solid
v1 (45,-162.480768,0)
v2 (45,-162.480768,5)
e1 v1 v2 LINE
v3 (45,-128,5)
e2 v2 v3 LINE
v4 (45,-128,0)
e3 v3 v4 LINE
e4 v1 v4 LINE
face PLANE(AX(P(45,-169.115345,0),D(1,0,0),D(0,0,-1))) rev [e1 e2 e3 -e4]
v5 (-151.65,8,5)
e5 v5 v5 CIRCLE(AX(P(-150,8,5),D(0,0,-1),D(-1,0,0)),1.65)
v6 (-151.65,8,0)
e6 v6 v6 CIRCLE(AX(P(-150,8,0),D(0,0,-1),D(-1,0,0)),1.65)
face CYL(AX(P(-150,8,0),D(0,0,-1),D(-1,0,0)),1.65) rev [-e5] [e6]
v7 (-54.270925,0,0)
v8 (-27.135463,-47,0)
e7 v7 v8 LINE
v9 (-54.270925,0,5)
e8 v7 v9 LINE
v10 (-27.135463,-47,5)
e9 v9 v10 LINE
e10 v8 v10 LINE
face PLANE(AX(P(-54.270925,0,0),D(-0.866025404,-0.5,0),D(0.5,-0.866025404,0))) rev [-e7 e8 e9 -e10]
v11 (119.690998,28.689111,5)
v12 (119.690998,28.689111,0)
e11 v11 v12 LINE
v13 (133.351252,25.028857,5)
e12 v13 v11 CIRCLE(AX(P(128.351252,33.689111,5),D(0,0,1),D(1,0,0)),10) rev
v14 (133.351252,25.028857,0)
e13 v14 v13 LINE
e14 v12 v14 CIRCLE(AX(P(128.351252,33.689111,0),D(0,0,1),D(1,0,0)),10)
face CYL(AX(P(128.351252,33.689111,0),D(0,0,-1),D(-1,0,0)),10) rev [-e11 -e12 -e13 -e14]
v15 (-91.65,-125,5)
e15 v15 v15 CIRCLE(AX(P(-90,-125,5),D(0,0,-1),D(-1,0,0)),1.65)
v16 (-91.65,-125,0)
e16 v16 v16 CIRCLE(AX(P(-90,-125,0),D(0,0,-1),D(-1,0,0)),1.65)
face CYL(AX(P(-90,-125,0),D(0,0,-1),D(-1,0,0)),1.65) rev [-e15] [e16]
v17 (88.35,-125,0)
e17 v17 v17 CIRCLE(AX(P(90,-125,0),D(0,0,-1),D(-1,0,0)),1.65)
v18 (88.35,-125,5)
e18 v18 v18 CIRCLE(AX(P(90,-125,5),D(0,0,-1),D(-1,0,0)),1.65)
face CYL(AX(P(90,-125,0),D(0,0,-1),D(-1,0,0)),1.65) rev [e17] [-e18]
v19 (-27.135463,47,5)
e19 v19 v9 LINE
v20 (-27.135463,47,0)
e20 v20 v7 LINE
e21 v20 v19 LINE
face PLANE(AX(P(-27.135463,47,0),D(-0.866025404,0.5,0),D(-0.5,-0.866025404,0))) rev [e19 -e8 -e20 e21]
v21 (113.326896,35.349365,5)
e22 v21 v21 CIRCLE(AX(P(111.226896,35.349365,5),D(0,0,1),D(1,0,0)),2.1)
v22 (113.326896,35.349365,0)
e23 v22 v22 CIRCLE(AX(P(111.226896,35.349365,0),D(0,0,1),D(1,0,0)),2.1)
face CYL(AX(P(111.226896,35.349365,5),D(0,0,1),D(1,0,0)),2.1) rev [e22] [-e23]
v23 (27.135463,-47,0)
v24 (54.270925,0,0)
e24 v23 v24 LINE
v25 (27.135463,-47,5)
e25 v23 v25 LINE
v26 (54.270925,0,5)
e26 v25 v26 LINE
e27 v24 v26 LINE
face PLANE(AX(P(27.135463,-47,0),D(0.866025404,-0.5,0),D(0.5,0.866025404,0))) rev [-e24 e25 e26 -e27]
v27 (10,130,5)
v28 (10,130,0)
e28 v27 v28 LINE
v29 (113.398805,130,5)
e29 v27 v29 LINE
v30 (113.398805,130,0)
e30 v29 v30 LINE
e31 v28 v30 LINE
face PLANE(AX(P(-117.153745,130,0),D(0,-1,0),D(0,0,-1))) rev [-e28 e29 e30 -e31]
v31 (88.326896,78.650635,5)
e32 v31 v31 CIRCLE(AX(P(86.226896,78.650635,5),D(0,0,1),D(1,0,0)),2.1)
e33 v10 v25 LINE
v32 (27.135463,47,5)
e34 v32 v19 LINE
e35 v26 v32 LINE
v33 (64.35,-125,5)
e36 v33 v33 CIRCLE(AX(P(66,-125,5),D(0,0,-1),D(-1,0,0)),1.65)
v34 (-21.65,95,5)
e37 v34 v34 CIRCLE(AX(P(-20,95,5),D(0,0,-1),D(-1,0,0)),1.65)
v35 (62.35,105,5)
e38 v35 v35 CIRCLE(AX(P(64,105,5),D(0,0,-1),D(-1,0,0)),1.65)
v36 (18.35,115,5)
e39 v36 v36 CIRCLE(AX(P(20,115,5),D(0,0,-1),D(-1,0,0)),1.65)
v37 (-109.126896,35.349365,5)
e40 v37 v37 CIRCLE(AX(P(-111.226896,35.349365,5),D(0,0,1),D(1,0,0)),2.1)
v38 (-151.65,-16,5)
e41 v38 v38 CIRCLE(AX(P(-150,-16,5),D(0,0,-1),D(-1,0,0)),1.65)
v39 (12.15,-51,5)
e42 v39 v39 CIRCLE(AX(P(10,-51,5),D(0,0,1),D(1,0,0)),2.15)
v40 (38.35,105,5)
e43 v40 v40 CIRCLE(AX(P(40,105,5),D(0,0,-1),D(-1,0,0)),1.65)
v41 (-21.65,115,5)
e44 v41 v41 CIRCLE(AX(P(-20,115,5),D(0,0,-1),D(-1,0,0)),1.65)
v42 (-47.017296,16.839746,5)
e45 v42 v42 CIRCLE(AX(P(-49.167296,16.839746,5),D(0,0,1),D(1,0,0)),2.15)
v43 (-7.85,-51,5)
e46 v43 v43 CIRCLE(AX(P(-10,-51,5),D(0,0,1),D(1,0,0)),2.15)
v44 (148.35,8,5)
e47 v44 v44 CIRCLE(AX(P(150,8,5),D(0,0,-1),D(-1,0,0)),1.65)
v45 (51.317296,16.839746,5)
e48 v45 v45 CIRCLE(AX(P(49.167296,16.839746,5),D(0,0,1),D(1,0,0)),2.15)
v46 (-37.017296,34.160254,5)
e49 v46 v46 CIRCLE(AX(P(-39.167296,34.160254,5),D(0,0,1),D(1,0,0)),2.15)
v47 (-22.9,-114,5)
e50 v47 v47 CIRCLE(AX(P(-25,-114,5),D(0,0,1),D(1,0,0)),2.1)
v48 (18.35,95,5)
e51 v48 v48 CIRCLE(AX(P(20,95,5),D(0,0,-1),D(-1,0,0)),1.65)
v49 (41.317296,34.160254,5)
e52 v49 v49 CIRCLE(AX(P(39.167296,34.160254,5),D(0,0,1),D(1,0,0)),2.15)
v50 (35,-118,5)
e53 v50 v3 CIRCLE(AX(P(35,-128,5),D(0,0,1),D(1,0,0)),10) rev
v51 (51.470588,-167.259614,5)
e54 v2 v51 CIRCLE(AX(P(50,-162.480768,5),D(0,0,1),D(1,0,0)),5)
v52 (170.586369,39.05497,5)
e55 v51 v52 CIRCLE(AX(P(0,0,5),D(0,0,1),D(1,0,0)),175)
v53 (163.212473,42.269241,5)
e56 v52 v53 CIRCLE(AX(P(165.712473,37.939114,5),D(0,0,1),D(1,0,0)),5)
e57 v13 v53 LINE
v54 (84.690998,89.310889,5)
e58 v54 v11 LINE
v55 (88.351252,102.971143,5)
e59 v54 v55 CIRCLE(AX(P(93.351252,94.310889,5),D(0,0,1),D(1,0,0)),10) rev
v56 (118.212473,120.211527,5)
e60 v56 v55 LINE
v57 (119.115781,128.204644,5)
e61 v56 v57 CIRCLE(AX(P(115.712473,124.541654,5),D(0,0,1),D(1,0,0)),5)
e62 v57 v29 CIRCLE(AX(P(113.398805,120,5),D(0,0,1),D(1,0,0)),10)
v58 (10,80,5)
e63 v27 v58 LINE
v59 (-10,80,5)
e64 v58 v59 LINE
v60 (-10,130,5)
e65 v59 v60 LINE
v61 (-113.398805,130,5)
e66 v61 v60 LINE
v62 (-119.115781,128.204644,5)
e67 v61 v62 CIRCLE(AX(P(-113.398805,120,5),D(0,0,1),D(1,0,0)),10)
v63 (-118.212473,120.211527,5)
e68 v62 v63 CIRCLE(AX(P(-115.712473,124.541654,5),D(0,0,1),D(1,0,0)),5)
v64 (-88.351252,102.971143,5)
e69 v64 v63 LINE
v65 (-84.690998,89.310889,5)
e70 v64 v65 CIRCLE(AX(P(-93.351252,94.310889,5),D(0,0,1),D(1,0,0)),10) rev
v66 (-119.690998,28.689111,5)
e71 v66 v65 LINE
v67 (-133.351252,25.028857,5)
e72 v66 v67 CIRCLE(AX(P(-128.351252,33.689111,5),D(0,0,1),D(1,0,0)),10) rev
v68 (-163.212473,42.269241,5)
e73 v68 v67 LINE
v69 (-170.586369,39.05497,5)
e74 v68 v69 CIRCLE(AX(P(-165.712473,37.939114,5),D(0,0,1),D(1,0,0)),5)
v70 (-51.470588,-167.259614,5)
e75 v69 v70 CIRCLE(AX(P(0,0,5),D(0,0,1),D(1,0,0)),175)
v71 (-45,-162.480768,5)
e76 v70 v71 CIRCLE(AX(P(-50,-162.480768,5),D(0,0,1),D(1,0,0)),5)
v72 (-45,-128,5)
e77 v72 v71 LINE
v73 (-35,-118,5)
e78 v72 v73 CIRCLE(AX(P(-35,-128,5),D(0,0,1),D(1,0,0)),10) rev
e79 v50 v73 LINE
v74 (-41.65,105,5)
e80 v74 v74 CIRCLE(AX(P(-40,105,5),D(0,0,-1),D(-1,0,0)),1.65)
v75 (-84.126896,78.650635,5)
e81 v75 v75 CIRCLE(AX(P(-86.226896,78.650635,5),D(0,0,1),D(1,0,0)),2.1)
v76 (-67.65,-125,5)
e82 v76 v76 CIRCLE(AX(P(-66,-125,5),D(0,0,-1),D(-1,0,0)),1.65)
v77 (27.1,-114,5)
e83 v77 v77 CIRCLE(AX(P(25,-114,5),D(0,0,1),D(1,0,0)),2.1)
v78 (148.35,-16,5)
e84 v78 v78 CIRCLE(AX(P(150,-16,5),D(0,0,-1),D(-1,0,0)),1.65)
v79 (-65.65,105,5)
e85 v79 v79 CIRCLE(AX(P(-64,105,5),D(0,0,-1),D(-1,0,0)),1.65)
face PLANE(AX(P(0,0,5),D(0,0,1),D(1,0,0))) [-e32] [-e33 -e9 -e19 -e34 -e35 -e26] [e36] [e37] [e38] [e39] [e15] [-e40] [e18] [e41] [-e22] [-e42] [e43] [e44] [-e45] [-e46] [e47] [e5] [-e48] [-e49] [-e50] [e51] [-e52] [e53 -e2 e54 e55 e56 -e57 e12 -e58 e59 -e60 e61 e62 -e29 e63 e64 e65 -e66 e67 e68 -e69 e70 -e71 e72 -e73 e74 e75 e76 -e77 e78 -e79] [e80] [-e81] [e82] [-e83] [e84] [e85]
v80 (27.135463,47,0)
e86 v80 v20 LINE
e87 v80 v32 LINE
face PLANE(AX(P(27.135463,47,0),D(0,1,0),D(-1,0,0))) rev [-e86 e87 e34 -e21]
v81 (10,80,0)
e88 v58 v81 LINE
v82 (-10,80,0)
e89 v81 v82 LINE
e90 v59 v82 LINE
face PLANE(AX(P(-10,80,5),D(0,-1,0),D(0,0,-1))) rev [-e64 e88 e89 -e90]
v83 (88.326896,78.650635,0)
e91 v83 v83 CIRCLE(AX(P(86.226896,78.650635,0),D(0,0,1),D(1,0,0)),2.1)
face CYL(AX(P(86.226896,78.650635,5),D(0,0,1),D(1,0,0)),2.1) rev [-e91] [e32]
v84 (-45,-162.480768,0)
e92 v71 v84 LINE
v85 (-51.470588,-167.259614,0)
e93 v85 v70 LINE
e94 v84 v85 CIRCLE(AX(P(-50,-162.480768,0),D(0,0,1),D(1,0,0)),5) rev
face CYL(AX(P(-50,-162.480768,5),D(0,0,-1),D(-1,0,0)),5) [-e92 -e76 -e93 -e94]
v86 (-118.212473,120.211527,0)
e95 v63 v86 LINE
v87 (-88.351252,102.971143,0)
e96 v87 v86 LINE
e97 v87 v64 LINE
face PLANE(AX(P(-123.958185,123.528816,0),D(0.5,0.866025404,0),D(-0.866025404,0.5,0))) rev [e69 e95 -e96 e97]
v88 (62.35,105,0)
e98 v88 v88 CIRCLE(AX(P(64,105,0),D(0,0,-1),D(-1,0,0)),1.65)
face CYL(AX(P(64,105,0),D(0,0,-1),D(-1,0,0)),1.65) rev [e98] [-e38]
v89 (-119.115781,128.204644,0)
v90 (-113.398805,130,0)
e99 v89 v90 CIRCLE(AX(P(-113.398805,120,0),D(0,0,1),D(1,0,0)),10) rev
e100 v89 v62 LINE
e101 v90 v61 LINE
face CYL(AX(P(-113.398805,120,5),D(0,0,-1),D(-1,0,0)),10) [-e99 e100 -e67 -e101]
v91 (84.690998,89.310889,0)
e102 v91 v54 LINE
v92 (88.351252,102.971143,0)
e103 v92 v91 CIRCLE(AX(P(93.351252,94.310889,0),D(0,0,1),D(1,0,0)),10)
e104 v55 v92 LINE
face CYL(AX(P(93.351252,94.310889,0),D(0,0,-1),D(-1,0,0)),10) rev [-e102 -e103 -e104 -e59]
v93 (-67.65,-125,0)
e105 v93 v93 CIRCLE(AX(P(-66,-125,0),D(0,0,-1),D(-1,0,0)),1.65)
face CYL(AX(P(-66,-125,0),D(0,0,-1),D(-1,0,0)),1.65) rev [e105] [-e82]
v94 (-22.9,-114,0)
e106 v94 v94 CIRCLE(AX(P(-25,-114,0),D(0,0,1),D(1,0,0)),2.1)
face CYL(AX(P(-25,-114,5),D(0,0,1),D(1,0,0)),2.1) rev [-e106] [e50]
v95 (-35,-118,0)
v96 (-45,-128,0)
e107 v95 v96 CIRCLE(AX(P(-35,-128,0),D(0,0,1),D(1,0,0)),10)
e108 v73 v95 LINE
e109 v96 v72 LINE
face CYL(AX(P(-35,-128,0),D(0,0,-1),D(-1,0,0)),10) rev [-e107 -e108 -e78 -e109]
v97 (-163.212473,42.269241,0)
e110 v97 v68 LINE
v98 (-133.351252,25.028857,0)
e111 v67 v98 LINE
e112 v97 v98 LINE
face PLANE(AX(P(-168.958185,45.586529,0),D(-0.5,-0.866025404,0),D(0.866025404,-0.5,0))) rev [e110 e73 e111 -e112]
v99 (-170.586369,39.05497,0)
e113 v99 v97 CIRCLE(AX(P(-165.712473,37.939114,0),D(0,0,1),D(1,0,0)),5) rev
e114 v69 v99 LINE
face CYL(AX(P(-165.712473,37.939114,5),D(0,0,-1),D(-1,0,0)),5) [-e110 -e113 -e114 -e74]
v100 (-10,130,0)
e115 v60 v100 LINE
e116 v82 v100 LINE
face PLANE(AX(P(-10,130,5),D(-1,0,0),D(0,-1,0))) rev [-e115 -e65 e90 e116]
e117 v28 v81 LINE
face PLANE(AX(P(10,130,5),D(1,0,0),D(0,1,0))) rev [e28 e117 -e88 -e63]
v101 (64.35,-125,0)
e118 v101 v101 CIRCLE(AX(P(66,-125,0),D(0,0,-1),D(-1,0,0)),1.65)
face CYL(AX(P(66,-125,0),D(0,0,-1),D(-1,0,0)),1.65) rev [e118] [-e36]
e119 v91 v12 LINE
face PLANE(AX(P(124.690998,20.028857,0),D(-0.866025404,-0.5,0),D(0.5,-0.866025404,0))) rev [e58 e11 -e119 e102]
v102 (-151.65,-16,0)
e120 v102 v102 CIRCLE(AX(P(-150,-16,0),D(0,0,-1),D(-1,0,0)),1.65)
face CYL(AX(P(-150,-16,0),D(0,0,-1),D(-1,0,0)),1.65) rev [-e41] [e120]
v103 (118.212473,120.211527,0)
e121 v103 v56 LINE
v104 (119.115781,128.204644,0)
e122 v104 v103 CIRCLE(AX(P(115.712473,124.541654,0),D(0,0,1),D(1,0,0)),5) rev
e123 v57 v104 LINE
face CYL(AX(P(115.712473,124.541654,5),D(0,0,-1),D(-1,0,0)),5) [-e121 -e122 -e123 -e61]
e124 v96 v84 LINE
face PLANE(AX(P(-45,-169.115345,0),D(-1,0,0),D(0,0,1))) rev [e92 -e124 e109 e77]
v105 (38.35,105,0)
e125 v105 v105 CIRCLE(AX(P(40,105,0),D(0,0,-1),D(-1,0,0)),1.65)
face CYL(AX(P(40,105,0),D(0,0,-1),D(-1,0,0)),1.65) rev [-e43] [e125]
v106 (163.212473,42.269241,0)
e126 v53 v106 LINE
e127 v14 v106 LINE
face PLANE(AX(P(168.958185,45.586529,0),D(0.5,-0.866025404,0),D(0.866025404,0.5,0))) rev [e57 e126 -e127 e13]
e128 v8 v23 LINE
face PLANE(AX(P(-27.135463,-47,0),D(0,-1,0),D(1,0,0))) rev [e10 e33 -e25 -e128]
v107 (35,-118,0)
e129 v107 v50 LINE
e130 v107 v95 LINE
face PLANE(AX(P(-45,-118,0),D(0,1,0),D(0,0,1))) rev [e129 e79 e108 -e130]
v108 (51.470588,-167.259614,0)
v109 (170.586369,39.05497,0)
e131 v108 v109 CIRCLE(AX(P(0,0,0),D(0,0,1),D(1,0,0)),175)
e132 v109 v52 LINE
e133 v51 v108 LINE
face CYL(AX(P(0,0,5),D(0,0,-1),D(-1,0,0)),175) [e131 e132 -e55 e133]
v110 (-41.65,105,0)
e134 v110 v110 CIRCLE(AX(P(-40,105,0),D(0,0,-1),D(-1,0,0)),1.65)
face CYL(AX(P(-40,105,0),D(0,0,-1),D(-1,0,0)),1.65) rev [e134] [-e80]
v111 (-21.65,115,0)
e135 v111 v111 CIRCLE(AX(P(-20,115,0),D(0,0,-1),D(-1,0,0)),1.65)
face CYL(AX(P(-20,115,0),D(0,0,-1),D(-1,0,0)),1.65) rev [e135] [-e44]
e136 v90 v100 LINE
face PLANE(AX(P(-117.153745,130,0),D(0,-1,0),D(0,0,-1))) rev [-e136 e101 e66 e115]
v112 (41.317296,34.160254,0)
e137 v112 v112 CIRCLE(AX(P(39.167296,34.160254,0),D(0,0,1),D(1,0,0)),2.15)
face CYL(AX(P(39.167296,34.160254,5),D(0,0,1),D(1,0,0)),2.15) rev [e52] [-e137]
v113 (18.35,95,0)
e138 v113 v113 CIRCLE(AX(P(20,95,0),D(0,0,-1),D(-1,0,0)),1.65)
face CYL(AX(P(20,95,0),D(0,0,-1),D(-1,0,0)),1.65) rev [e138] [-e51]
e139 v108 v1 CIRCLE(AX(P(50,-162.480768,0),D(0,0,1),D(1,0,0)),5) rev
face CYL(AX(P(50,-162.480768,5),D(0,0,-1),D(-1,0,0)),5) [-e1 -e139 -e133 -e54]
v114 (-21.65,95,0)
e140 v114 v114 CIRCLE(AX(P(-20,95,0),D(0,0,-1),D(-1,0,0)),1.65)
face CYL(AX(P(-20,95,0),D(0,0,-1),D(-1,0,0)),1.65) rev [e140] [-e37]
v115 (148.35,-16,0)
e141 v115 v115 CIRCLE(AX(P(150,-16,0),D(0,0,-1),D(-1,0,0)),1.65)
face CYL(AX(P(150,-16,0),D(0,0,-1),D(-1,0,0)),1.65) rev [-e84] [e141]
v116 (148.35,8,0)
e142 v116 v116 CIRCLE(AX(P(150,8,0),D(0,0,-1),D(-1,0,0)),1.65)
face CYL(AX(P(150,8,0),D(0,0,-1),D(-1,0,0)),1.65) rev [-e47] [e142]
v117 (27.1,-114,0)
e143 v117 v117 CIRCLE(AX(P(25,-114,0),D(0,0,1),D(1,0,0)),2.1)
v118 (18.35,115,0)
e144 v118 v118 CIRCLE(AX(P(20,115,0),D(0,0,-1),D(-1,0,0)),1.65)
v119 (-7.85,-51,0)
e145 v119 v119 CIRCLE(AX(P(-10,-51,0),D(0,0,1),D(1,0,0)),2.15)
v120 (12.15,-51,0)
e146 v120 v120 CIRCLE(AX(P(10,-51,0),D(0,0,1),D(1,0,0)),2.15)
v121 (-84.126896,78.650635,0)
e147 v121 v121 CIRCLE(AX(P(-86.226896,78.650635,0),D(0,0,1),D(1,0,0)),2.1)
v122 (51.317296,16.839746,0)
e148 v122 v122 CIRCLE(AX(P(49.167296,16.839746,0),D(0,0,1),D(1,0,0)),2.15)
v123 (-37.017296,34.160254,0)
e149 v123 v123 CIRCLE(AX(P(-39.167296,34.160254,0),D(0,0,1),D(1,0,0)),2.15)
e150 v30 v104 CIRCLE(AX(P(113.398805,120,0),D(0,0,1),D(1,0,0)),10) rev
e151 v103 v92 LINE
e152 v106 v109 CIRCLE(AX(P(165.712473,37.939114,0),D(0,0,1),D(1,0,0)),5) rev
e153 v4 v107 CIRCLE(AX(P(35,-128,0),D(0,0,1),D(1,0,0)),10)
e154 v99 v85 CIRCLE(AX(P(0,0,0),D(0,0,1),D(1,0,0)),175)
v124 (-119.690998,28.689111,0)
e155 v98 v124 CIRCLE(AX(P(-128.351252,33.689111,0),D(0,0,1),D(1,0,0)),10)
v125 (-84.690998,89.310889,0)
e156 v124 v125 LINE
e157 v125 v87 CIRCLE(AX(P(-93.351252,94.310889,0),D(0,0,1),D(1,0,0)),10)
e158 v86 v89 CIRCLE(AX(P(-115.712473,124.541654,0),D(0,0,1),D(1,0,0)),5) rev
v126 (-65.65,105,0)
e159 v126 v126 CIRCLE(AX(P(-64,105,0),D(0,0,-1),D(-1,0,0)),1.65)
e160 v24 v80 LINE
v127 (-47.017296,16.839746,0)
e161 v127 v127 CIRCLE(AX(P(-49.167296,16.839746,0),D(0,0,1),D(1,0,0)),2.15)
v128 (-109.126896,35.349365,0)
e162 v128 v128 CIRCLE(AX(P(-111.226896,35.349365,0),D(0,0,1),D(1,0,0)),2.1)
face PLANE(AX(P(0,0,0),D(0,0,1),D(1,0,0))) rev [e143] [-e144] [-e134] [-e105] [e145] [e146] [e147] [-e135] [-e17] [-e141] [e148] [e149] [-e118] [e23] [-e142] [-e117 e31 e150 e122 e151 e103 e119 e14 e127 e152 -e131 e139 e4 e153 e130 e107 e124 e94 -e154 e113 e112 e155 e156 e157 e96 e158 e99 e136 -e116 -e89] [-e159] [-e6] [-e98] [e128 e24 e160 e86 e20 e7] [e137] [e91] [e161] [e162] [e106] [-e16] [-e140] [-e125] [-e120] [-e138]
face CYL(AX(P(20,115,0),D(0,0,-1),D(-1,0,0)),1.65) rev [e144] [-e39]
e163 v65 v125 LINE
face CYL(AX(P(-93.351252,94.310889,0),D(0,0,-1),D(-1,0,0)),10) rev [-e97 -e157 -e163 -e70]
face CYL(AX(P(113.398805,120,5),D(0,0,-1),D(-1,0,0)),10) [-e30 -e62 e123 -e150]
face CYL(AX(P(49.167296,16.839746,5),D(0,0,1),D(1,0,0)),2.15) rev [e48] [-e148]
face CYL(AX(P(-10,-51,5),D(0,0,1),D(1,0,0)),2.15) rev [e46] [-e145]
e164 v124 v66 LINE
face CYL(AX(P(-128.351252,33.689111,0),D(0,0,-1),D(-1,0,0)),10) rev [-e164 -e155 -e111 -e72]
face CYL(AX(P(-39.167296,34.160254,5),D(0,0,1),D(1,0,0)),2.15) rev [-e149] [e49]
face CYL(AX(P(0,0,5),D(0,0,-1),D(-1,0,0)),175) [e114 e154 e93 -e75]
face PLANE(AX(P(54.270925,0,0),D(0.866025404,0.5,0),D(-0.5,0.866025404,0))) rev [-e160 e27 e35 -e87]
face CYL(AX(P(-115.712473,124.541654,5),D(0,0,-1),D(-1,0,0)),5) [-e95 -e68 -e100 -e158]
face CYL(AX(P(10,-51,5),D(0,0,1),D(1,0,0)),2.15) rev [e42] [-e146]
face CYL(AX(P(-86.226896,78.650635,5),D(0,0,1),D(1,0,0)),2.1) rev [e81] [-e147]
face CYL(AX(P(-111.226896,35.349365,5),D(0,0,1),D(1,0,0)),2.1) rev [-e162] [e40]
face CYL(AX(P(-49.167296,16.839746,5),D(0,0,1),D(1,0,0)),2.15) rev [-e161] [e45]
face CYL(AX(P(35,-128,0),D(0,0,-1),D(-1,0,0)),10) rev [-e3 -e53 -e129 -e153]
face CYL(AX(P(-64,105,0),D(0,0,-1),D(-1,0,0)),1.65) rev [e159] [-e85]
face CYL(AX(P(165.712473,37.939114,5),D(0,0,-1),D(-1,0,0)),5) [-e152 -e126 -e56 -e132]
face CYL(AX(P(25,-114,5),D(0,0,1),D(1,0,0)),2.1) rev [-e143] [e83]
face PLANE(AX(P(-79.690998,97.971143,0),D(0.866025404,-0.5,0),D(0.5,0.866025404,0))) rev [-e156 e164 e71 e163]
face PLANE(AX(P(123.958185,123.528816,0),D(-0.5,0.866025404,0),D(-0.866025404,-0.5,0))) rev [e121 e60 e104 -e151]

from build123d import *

# Parameters (mm, degrees)
SKETCH_1_R                       = 175
EXTRUDE_1_DEPTH                  = 5
CUT_EXTRUDE_1_DEPTH              = 248.53787589
CUT_EXTRUDE_3_DEPTH              = 248.53787589
M5X0_8_1_D                       = 4.2
HOLE_WIZARD_M4_1_D               = 4.3
FILLET_1_R                       = 10
FILLET_2_R                       = 5
PATTERN_CIRCULAR_1_COUNT         = 3
FILLET_1_OF_PATTERN_CIRCULAR_1_R = 10
FILLET_2_OF_PATTERN_CIRCULAR_1_R = 5
CUT_EXTRUDE_2_DEPTH              = 243.280431899
M4X0_7_1_D                       = 3.3
M4X0_7_2_D                       = 3.3
M4X0_7_3_D                       = 3.3
M4X0_7_4_D                       = 3.3
PATTERN_LINEAR_1_COUNT           = 2
PATTERN_LINEAR_1_PITCH           = 20
SKETCH_30_W                      = 20
SKETCH_30_H                      = 50
CUT_EXTRUDE_4_DEPTH              = 243.280431899
FILLET_3_R                       = 10


with BuildPart() as part:
    # 草圖1 → 填料-伸長1 (new body)
    with BuildSketch(Plane.XY):
        Circle(SKETCH_1_R)
    extrude(amount=EXTRUDE_1_DEPTH)

    # 草圖6 → 除料-伸長1 (cut, through all)
    with BuildSketch(Plane.XY.offset(5)):
        with BuildLine():
            Line((-45, -169.115345253), (-45, -118))
            Line((-45, -118), (45, -118))
            Line((45, -118), (45, -169.115345253))
            ThreePointArc((45, -169.115345253), (0, -175), (-45, -169.115345253))
        make_face()
    cut_extrude_1 = extrude(amount=-CUT_EXTRUDE_1_DEPTH, mode=Mode.SUBTRACT)

    # 草圖12 → 除料-伸長3 (cut, through all)
    with BuildSketch(Plane.XY.offset(5)):
        with BuildLine():
            Line((-117.153745139, 130), (117.153745139, 130))
            ThreePointArc((117.153745139, 130), (0, 175), (-117.153745139, 130))
        make_face()
    extrude(amount=-CUT_EXTRUDE_3_DEPTH, mode=Mode.SUBTRACT)

    # M5x0.8 螺紋孔1 (through all)
    with Locations(Plane.XY.offset(5)):
        with Locations((25, -114), (-25, -114)):
            m5x0_8_1 = Hole(M5X0_8_1_D / 2)

    # M4 餘隙孔1 (through all)
    with Locations(Plane.XY.offset(5)):
        with Locations((10, -51), (-10, -51)):
            hole_wizard_m4_1 = Hole(HOLE_WIZARD_M4_1_D / 2)

    # 圓角1
    fillet_1_edges = [part.edges().sort_by_distance(p)[0] for p in [
        (45, -118, 2.5),
        (-45, -118, 2.5),
    ]]
    fillet(fillet_1_edges, radius=FILLET_1_R)

    # 圓角2
    fillet_2_edges = [part.edges().sort_by_distance(p)[0] for p in [
        (45, -169.115345253, 2.5),
        (-45, -169.115345253, 2.5),
    ]]
    fillet(fillet_2_edges, radius=FILLET_2_R)

    # 環狀複製排列1: 除料-伸長1, M5x0.8 螺紋孔1, M4 餘隙孔1 ×3 about axis
    pattern_circular_1_axis = Axis((0, 0, 0), (0, 0, 1))
    add([cut_extrude_1.rotate(pattern_circular_1_axis, i * 360 / PATTERN_CIRCULAR_1_COUNT) for i in range(1, PATTERN_CIRCULAR_1_COUNT)], mode=Mode.SUBTRACT)
    add([m5x0_8_1.rotate(pattern_circular_1_axis, i * 360 / PATTERN_CIRCULAR_1_COUNT) for i in range(1, PATTERN_CIRCULAR_1_COUNT)], mode=Mode.SUBTRACT)
    add([hole_wizard_m4_1.rotate(pattern_circular_1_axis, i * 360 / PATTERN_CIRCULAR_1_COUNT) for i in range(1, PATTERN_CIRCULAR_1_COUNT)], mode=Mode.SUBTRACT)

    # 圓角1 of 環狀複製排列1
    fillet_1_of_pattern_circular_1_edges = [part.edges().sort_by_distance(p)[0] for p in [
        (79.690997647, 97.97114317, 2.5),
        (124.690997647, 20.02885683, 2.5),
        (-124.690997647, 20.02885683, 2.5),
        (-79.690997647, 97.97114317, 2.5),
    ]]
    fillet(fillet_1_of_pattern_circular_1_edges, radius=FILLET_1_OF_PATTERN_CIRCULAR_1_R)

    # 圓角2 of 環狀複製排列1
    fillet_2_of_pattern_circular_1_edges = [part.edges().sort_by_distance(p)[0] for p in [
        (123.958185159, 123.528815797, 2.5),
        (168.958185159, 45.586529456, 2.5),
        (-168.958185159, 45.586529456, 2.5),
        (-123.958185159, 123.528815797, 2.5),
    ]]
    fillet(fillet_2_of_pattern_circular_1_edges, radius=FILLET_2_OF_PATTERN_CIRCULAR_1_R)

    # 草圖11 → 除料-伸長2 (cut, through all)
    with BuildSketch(Plane.XY.offset(5)):
        Polygon((54.270925304, 0), (27.135462652, 47), (-27.135462652, 47), (-54.270925304, 0), (-27.135462652, -47), (27.135462652, -47), align=None)
    extrude(amount=-CUT_EXTRUDE_2_DEPTH, mode=Mode.SUBTRACT)

    # M4x0.7 螺紋孔1 (through all)
    with Locations(Plane(origin=(0, 0, 0), x_dir=(1, 0, 0), z_dir=(0, 0, -1))):
        with Locations((64, -105), (-40, -105), (40, -105), (-64, -105)):
            Hole(M4X0_7_1_D / 2)

    # M4x0.7 螺紋孔2 (through all)
    with Locations(Plane(origin=(0, 0, 0), x_dir=(-1, 0, 0), z_dir=(0, 0, -1))):
        with Locations((-150, -16), (-150, 8)):
            m4x0_7_2 = Hole(M4X0_7_2_D / 2)

    # 鏡射1: M4x0.7 螺紋孔2 across plane
    add(m4x0_7_2.mirror(Plane(origin=(0, 0, 0), x_dir=(0, 0, 1), z_dir=(1, 0, 0))), mode=Mode.SUBTRACT)

    # M4x0.7 螺紋孔3 (through all)
    with Locations(Plane(origin=(0, 0, 0), x_dir=(-1, 0, 0), z_dir=(0, 0, -1))):
        with Locations((-90, -125), (90, -125), (-66, -125), (66, -125)):
            Hole(M4X0_7_3_D / 2)

    # M4x0.7 螺紋孔4 (through all)
    with Locations(Plane(origin=(0, 0, 0), x_dir=(-1, 0, 0), z_dir=(0, 0, -1))):
        with Locations((-20, 95), (0, 95), (20, 95)):
            m4x0_7_4 = Hole(M4X0_7_4_D / 2)

    # 直線複製排列1: M4x0.7 螺紋孔4 ×2
    with Locations(*[(0, i * PATTERN_LINEAR_1_PITCH, 0) for i in range(1, PATTERN_LINEAR_1_COUNT)]):
        add(m4x0_7_4, mode=Mode.SUBTRACT)

    # 草圖30 → 除料-伸長4 (cut, through all)
    with BuildSketch(Plane(origin=(0, 0, 0), x_dir=(-1, 0, 0), z_dir=(0, 0, -1))):
        with Locations((0, 105)):
            Rectangle(SKETCH_30_W, SKETCH_30_H)
    extrude(amount=-CUT_EXTRUDE_4_DEPTH, mode=Mode.SUBTRACT)

    # 圓角3
    # the kernel refuses this fillet: 10 mm, written as the material it takes off along each edge
    with BuildSketch(Plane(origin=(117.153745139, 130, 14.387351056), x_dir=(-1, 0, 0), z_dir=(0, 0, -1))) as fillet_3_piece_1:
        with BuildLine():
            CenterArc((3.754940422, -10), FILLET_3_R, 90, 34.868690312)
            ThreePointArc((-1.962035679, -1.795355934), (-0.984428411, -0.89395076), (0, 0))
            Line((0, 0), (3.754940422, 0))
        make_face()
    extrude(amount=23.774702112, mode=Mode.SUBTRACT)
    with BuildSketch(Plane(origin=(-117.153745139, 130, 14.387351056), x_dir=(-0.7377488527990645, -0.6750752774273876, 0), z_dir=(0, 0, -1))) as fillet_3_piece_2:
        with BuildLine():
            CenterArc((3.980549785, -9.912355975), FILLET_3_R, 97.591305889, 34.868690312)
            Line((-2.770202989, -2.534867447), (0, 0))
            ThreePointArc((0, 0), (1.329744988, 0.005052135), (2.659489977, 0))
        make_face()
    extrude(amount=23.774702112, mode=Mode.SUBTRACT)


solid = part.part
